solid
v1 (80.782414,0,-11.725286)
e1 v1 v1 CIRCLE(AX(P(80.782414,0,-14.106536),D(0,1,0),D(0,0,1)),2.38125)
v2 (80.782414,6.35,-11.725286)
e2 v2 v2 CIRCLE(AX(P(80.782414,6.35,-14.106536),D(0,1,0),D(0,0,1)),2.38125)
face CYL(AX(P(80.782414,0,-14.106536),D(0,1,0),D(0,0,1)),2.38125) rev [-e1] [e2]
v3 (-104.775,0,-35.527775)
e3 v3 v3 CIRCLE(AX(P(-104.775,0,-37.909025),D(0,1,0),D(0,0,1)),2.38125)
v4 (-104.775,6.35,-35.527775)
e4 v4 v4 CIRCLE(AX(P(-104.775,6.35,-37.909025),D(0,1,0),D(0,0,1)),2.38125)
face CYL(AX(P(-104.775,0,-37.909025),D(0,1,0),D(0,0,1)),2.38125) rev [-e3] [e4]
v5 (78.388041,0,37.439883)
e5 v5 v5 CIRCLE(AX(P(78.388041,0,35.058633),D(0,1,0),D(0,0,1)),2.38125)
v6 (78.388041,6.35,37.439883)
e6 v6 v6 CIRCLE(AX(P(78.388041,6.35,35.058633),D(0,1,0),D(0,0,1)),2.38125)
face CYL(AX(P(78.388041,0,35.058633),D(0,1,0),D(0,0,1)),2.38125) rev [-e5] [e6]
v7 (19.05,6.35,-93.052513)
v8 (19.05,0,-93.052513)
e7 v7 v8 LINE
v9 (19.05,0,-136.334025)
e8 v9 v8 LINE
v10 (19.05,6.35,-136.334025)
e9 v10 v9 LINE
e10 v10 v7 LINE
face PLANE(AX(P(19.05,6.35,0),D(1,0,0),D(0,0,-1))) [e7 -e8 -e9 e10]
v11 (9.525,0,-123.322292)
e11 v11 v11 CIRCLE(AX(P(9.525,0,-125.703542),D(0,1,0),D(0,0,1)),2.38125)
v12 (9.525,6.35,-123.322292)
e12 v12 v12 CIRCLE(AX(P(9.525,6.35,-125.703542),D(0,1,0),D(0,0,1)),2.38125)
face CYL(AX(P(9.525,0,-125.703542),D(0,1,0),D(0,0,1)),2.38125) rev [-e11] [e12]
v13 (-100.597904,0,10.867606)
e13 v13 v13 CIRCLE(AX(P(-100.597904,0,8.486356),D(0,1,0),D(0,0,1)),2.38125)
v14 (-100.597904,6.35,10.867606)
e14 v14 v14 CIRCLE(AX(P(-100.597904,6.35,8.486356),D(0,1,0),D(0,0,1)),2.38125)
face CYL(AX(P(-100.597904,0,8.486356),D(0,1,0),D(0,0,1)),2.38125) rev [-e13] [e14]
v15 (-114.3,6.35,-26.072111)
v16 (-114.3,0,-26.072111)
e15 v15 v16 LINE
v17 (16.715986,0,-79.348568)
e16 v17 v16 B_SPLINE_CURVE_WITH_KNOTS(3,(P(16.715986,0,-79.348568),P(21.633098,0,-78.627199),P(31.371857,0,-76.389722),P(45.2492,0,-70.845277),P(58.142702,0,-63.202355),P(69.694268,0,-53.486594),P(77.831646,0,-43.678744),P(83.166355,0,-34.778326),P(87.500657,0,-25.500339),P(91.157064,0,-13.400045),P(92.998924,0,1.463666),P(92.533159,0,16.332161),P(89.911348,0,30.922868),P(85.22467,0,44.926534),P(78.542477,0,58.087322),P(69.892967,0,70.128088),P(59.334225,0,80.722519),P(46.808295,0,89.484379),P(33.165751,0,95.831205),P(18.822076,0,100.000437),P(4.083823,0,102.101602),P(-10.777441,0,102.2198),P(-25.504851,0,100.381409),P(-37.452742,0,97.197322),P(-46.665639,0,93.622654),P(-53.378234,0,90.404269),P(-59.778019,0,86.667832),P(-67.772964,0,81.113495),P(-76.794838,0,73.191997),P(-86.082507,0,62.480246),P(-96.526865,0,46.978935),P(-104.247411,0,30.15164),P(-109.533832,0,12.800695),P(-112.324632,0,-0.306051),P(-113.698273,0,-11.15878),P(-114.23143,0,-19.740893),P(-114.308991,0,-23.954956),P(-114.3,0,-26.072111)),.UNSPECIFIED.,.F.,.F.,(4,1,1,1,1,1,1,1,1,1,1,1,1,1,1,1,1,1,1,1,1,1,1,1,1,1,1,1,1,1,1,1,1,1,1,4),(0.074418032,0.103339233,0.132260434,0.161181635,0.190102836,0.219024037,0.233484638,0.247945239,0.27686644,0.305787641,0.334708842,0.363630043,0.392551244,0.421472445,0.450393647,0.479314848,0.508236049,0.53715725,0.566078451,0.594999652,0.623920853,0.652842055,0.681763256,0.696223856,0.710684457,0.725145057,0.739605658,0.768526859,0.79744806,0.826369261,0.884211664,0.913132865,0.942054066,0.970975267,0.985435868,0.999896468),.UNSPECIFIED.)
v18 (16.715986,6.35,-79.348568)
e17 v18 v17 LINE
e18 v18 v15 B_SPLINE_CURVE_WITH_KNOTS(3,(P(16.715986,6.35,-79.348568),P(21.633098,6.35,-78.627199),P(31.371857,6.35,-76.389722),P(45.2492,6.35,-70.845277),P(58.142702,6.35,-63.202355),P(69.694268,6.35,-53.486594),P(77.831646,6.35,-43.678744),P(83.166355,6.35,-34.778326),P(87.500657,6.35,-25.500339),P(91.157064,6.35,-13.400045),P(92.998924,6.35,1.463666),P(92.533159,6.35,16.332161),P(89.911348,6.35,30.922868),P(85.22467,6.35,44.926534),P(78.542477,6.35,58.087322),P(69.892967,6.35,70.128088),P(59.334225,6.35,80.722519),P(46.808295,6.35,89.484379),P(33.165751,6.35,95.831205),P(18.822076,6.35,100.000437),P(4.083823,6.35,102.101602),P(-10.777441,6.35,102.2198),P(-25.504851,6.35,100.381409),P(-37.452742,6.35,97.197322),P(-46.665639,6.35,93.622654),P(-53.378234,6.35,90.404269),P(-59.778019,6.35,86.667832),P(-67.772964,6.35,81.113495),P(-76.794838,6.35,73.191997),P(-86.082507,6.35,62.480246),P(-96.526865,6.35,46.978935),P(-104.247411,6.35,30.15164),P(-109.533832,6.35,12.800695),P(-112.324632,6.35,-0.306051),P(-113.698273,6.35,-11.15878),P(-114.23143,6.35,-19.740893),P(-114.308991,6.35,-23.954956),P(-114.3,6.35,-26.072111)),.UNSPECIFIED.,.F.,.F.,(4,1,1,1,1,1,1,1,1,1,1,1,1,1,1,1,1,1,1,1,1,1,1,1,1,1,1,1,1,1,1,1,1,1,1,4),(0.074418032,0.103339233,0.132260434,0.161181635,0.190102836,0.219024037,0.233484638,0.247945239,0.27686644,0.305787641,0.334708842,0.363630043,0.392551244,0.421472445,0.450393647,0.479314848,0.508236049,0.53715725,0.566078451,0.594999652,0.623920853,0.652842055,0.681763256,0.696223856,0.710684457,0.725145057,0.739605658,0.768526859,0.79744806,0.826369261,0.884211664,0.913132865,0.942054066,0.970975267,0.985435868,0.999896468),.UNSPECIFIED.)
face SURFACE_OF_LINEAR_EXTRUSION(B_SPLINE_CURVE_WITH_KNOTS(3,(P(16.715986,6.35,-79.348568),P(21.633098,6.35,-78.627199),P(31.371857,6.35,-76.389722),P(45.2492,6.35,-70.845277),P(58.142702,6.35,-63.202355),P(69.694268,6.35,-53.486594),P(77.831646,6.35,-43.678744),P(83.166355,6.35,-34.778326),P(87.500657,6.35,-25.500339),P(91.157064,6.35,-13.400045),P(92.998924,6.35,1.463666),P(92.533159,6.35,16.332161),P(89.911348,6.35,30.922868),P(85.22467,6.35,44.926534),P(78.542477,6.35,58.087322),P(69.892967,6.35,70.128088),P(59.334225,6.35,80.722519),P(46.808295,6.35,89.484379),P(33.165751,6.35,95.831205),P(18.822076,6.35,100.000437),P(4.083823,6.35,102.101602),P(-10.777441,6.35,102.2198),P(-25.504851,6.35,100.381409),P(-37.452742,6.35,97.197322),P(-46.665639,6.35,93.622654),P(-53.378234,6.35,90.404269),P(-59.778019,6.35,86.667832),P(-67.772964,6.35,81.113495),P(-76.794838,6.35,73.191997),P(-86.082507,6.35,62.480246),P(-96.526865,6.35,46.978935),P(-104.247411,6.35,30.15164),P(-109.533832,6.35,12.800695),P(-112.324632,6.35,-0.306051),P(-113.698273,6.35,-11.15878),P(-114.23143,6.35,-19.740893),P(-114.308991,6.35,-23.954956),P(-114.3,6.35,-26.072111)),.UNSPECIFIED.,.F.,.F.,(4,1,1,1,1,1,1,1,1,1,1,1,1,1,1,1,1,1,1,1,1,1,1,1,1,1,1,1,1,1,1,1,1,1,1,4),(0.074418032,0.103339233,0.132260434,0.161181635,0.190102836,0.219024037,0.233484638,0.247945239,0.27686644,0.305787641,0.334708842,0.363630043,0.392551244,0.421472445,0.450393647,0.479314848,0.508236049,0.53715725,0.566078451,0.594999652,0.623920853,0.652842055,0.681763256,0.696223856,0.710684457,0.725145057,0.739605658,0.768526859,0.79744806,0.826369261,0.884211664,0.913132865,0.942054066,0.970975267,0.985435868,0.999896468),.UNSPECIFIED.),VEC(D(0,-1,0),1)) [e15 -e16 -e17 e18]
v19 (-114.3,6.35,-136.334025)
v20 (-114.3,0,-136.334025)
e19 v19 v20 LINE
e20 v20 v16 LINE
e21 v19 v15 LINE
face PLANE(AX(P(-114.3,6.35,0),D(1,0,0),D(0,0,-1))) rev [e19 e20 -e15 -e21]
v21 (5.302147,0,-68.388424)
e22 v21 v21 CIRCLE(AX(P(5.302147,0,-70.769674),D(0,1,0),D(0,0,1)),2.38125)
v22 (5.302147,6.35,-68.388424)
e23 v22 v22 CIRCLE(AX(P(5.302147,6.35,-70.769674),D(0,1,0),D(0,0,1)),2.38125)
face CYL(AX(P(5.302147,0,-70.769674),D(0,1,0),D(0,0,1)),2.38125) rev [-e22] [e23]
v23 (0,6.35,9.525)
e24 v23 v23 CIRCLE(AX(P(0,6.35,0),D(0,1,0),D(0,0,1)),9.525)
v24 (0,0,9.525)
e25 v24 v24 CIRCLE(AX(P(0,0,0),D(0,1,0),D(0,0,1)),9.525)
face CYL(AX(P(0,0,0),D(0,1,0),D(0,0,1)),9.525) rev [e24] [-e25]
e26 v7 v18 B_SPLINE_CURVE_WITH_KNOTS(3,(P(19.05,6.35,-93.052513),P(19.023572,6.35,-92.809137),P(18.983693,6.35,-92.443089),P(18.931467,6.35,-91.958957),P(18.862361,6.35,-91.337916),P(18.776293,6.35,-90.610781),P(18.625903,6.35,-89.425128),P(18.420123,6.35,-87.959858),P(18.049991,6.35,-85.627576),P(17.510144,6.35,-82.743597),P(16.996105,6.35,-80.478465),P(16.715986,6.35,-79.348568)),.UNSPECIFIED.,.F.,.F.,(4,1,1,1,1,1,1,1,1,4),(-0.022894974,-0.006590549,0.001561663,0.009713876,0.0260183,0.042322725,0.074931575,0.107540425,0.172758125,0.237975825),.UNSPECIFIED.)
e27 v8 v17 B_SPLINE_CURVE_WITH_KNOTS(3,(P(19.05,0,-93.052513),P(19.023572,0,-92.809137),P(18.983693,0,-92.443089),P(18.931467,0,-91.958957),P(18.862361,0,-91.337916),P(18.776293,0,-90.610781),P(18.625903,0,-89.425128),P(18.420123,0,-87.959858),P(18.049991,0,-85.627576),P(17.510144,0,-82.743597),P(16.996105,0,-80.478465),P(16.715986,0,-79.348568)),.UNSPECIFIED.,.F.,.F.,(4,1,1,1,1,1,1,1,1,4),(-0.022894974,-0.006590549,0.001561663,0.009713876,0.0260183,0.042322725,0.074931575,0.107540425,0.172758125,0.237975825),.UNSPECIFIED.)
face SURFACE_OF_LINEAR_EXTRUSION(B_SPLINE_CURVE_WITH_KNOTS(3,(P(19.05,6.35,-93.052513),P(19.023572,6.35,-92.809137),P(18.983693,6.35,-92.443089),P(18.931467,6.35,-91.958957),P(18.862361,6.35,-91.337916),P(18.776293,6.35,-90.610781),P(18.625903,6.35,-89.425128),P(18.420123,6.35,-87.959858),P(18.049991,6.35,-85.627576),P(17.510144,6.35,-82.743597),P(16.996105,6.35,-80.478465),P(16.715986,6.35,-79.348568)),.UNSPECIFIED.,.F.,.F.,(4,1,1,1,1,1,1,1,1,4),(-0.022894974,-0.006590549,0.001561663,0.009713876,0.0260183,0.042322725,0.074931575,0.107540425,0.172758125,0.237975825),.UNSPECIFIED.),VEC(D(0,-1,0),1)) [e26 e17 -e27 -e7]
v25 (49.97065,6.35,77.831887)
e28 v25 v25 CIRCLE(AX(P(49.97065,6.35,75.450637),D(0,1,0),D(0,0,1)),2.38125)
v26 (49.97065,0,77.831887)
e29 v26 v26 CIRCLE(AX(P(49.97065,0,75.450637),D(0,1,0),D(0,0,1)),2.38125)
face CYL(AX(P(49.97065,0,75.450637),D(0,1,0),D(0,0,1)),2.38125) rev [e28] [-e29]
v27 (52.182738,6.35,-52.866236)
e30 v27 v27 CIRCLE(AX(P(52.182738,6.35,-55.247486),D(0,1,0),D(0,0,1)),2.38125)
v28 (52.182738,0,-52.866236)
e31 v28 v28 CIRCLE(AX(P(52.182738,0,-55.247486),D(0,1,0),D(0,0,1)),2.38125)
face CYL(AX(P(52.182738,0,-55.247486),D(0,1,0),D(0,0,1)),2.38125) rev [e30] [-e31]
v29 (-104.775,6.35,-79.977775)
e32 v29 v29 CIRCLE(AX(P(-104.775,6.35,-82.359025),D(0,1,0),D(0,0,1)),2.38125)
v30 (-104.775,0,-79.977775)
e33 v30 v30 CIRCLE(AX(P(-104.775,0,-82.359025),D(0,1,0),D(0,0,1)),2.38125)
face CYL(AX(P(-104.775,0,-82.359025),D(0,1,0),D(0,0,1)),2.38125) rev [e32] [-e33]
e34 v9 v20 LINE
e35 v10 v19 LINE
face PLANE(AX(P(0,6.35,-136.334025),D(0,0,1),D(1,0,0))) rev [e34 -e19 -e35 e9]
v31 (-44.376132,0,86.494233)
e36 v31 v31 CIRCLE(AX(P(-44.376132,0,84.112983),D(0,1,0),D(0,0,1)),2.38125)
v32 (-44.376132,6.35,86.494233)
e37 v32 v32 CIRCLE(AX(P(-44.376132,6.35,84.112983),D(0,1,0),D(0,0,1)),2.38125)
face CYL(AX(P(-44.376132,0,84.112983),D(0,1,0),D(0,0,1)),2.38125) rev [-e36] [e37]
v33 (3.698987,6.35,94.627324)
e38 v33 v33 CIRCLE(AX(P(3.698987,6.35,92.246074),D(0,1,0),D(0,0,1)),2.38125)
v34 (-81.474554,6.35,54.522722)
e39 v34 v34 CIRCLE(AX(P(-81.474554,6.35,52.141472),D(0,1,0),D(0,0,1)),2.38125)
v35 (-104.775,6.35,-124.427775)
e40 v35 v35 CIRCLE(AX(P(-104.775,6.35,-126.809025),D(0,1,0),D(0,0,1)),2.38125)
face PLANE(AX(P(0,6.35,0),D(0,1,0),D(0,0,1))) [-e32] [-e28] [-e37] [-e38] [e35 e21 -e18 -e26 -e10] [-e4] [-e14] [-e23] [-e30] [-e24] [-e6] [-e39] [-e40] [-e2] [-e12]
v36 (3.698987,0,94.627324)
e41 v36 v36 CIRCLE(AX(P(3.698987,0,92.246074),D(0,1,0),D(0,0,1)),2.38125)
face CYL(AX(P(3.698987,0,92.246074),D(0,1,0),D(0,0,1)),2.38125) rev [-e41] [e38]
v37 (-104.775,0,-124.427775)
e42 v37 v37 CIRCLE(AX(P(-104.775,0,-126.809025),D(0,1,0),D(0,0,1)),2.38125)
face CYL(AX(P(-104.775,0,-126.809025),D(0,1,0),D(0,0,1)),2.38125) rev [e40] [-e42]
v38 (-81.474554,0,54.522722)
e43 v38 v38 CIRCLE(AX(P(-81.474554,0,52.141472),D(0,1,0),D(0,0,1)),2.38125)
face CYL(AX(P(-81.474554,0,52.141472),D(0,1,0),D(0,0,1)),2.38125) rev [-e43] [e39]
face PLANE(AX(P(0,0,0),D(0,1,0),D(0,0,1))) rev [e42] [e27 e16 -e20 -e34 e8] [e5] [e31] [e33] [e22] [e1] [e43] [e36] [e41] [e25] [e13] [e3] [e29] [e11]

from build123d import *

# Parameters (mm, degrees)
BOSS_EXTRUDE1_DEPTH   = 6.35
FILLET1_R             = 2.54
FILLET2_R             = 0.79375
SKETCH4_R             = 2.38125
CUT_EXTRUDE3_DEPTH    = 6.35
CRVPATTERN1_OUTLINE_R = 2.38125
CRVPATTERN1_DEPTH     = 6.35
SKETCH5_R             = 9.525
BOSS_EXTRUDE2_DEPTH   = 6.35


# Read off the part's stored shape, not the designer's step: CrvPattern1
with BuildPart() as part:
    # Sketch1 → Boss-Extrude1 (new body)
    with BuildSketch(Plane(origin=(0, 0, 0), x_dir=(1, 0, 0), z_dir=(0, 1, 0))):
        with BuildLine():
            Line((0, 136.334024978), (0, 94.083801247))
            add(Edge.make_bspline(
                [(0, 94.083801247), (-2.431386336, 71.693275709), (-15.75825593, 58.230430146)],
                knots=[0, 0, 0, 1, 1, 1], degree=2))
            add(Edge.make_bspline(
                [(-15.75825593, 58.230430146), (12.928997408, 67.764135595), (70.60122301, 46.247103047), (77.540383798, -26.213493844), (40.518788725, -85.775261158), (-67.055108572, -88.304279922), (-95.415707681, -10.214485927), (-95.25, 26.030170649)],
                knots=[0, 0, 0, 0, 0.227546357, 0.356849793, 0.49581236, 0.710996888, 1, 1, 1, 1], degree=3))
            Line((-95.25, 26.030170649), (-95.25, 136.334024978))
            Line((-95.25, 136.334024978), (-114.3, 136.334024978))
            Line((-114.3, 136.334024978), (-114.3, 26.072111228))
            add(Edge.make_bspline(
                [(16.715986391, 79.348568009), (21.633097871, 78.62719896), (31.371857261, 76.389721894), (45.249200497, 70.845276961), (58.14270202, 63.202354702), (69.694268499, 53.486594004), (77.831645881, 43.678743898), (83.1663553, 34.778326042), (87.500656656, 25.500338712), (91.157064432, 13.400044888), (92.998924079, -1.463666218), (92.533158628, -16.332160856), (89.911348046, -30.922868008), (85.224669703, -44.926534482), (78.5424766, -58.087321563), (69.892966554, -70.128088223), (59.334225085, -80.722518946), (46.808294676, -89.48437896), (33.165750854, -95.831204537), (18.8220758, -100.00043745), (4.083822861, -102.101602424), (-10.777441223, -102.219799961), (-25.504851136, -100.381408636), (-37.452741503, -97.197322494), (-46.66563909, -93.622653994), (-53.378233983, -90.404269128), (-59.778019163, -86.667831837), (-67.772964247, -81.11349497), (-76.794838317, -73.191996697), (-86.082507199, -62.480245978), (-96.526865188, -46.978935087), (-104.24741081, -30.151640125), (-109.53383183, -12.800694626), (-112.324631517, 0.306051107), (-113.698273493, 11.158780223), (-114.231429958, 19.740893087), (-114.308990648, 23.9549561), (-114.3, 26.072111228)],
                knots=[0.074418032, 0.074418032, 0.074418032, 0.074418032, 0.103339233, 0.132260434, 0.161181635, 0.190102836, 0.219024037, 0.233484638, 0.247945239, 0.27686644, 0.305787641, 0.334708842, 0.363630043, 0.392551244, 0.421472445, 0.450393647, 0.479314848, 0.508236049, 0.53715725, 0.566078451, 0.594999652, 0.623920853, 0.652842055, 0.681763256, 0.696223856, 0.710684457, 0.725145057, 0.739605658, 0.768526859, 0.79744806, 0.826369261, 0.884211664, 0.913132865, 0.942054066, 0.970975267, 0.985435868, 0.999896468, 0.999896468, 0.999896468, 0.999896468], degree=3))
            add(Edge.make_bspline(
                [(19.05, 93.052513121), (19.023571763, 92.809136693), (18.983692868, 92.443089224), (18.931467162, 91.958957236), (18.862360798, 91.337915751), (18.776292871, 90.610780885), (18.625902721, 89.42512839), (18.420122868, 87.959858448), (18.049990563, 85.627575808), (17.510143571, 82.743597147), (16.996105499, 80.478464636), (16.715986391, 79.348568009)],
                knots=[-0.022894974, -0.022894974, -0.022894974, -0.022894974, -0.006590549, 0.001561663, 0.009713876, 0.0260183, 0.042322725, 0.074931575, 0.107540425, 0.172758125, 0.237975825, 0.237975825, 0.237975825, 0.237975825], degree=3))
            Line((19.05, 93.052513121), (19.05, 136.334024978))
            Line((19.05, 136.334024978), (0, 136.334024978))
        make_face()
    extrude(amount=BOSS_EXTRUDE1_DEPTH)

    # Fillet1
    fillet1_edges = [part.edges().sort_by_distance(p)[0] for p in [
        (0, 3.175, -94.083801247),
        (-95.25, 3.175, -26.030170649),
    ]]
    fillet(fillet1_edges, radius=FILLET1_R)

    # Fillet2
    fillet2_edges = [part.edges().sort_by_distance(p)[0] for p in [
        (-15.75825593, 3.175, -58.230430146),
    ]]
    fillet(fillet2_edges, radius=FILLET2_R)

    # Sketch4 → Cut-Extrude3 (cut)
    with BuildSketch(Plane(origin=(0, 6.35, 0), x_dir=(1, 0, 0), z_dir=(0, 1, 0))):
        with Locations(Location((-104.775, 126.809024978, 0), (0, 0, 270))):
            Circle(SKETCH4_R)
    extrude(amount=-CUT_EXTRUDE3_DEPTH, mode=Mode.SUBTRACT)

    # CrvPattern1 outline → CrvPattern1 (cut)
    with BuildSketch(Plane(origin=(0, 0, 0), x_dir=(1, 0, 0), z_dir=(0, 1, 0))):
        with Locations((-104.775, 82.359024978)):
            Circle(CRVPATTERN1_OUTLINE_R)
        with Locations((-104.775, 37.909024978)):
            Circle(CRVPATTERN1_OUTLINE_R)
        with Locations((-100.597903535, -8.486356178)):
            Circle(CRVPATTERN1_OUTLINE_R)
        with Locations((-81.474554, -52.141471765)):
            Circle(CRVPATTERN1_OUTLINE_R)
        with Locations((-44.376132313, -84.112983027)):
            Circle(CRVPATTERN1_OUTLINE_R)
        with Locations((3.698987105, -92.246074321)):
            Circle(CRVPATTERN1_OUTLINE_R)
        with Locations((49.97064989, -75.450636534)):
            Circle(CRVPATTERN1_OUTLINE_R)
        with Locations((78.388040736, -35.058632959)):
            Circle(CRVPATTERN1_OUTLINE_R)
        with Locations((80.782414242, 14.106535639)):
            Circle(CRVPATTERN1_OUTLINE_R)
        with Locations((52.182738061, 55.247486043)):
            Circle(CRVPATTERN1_OUTLINE_R)
        with Locations((5.302146984, 70.7696737)):
            Circle(CRVPATTERN1_OUTLINE_R)
        with Locations((9.525, 125.703541591)):
            Circle(CRVPATTERN1_OUTLINE_R)
    extrude(amount=CRVPATTERN1_DEPTH, mode=Mode.SUBTRACT)

    # Sketch5 → Boss-Extrude2 (add)
    with BuildSketch(Plane(origin=(0, 6.35, 0), x_dir=(1, 0, 0), z_dir=(0, 1, 0))):
        with BuildLine():
            Line((0, 94.222341016), (0, 136.334024978))
            Line((0, 136.334024978), (-95.25, 136.334024978))
            Line((-95.25, 136.334024978), (-95.25, 26.035946481))
            Line((-95.25, 26.035946481), (-95.250025994, 26.02445519))
            add(Edge.make_bspline(
                [(-95.250025994, 26.02445519), (-95.413998653, -10.219191455), (-67.052567731, -88.304220188), (40.518788725, -85.775261158), (77.540383798, -26.213493844), (70.704250586, 45.171261183), (15.28602209, 66.863348491), (-12.949636793, 59.083069401)],
                knots=[1.5191e-05, 1.5191e-05, 1.5191e-05, 1.5191e-05, 0.289003112, 0.50418764, 0.643150207, 0.772453643, 0.992638541, 0.992638541, 0.992638541, 0.992638541], degree=3))
            ThreePointArc((-12.949636793, 59.083069401), (-13.833627454, 59.427668219), (-13.755858665, 60.373257902))
            add(Edge.make_bspline(
                [(-13.755858665, 60.373257902), (-2.2817326, 73.386271149), (-0.015296893, 93.943999106)],
                knots=[0, 0, 0, 1, 1, 1], degree=2))
            ThreePointArc((-0.015296893, 93.943999106), (-0.003827106, 94.082960051), (0, 94.222341016))
        make_face()
        with Locations(Location((0, 0, 0), (0, 0, 270))):
            Circle(SKETCH5_R, mode=Mode.SUBTRACT)
    extrude(amount=-BOSS_EXTRUDE2_DEPTH)


solid = part.part
